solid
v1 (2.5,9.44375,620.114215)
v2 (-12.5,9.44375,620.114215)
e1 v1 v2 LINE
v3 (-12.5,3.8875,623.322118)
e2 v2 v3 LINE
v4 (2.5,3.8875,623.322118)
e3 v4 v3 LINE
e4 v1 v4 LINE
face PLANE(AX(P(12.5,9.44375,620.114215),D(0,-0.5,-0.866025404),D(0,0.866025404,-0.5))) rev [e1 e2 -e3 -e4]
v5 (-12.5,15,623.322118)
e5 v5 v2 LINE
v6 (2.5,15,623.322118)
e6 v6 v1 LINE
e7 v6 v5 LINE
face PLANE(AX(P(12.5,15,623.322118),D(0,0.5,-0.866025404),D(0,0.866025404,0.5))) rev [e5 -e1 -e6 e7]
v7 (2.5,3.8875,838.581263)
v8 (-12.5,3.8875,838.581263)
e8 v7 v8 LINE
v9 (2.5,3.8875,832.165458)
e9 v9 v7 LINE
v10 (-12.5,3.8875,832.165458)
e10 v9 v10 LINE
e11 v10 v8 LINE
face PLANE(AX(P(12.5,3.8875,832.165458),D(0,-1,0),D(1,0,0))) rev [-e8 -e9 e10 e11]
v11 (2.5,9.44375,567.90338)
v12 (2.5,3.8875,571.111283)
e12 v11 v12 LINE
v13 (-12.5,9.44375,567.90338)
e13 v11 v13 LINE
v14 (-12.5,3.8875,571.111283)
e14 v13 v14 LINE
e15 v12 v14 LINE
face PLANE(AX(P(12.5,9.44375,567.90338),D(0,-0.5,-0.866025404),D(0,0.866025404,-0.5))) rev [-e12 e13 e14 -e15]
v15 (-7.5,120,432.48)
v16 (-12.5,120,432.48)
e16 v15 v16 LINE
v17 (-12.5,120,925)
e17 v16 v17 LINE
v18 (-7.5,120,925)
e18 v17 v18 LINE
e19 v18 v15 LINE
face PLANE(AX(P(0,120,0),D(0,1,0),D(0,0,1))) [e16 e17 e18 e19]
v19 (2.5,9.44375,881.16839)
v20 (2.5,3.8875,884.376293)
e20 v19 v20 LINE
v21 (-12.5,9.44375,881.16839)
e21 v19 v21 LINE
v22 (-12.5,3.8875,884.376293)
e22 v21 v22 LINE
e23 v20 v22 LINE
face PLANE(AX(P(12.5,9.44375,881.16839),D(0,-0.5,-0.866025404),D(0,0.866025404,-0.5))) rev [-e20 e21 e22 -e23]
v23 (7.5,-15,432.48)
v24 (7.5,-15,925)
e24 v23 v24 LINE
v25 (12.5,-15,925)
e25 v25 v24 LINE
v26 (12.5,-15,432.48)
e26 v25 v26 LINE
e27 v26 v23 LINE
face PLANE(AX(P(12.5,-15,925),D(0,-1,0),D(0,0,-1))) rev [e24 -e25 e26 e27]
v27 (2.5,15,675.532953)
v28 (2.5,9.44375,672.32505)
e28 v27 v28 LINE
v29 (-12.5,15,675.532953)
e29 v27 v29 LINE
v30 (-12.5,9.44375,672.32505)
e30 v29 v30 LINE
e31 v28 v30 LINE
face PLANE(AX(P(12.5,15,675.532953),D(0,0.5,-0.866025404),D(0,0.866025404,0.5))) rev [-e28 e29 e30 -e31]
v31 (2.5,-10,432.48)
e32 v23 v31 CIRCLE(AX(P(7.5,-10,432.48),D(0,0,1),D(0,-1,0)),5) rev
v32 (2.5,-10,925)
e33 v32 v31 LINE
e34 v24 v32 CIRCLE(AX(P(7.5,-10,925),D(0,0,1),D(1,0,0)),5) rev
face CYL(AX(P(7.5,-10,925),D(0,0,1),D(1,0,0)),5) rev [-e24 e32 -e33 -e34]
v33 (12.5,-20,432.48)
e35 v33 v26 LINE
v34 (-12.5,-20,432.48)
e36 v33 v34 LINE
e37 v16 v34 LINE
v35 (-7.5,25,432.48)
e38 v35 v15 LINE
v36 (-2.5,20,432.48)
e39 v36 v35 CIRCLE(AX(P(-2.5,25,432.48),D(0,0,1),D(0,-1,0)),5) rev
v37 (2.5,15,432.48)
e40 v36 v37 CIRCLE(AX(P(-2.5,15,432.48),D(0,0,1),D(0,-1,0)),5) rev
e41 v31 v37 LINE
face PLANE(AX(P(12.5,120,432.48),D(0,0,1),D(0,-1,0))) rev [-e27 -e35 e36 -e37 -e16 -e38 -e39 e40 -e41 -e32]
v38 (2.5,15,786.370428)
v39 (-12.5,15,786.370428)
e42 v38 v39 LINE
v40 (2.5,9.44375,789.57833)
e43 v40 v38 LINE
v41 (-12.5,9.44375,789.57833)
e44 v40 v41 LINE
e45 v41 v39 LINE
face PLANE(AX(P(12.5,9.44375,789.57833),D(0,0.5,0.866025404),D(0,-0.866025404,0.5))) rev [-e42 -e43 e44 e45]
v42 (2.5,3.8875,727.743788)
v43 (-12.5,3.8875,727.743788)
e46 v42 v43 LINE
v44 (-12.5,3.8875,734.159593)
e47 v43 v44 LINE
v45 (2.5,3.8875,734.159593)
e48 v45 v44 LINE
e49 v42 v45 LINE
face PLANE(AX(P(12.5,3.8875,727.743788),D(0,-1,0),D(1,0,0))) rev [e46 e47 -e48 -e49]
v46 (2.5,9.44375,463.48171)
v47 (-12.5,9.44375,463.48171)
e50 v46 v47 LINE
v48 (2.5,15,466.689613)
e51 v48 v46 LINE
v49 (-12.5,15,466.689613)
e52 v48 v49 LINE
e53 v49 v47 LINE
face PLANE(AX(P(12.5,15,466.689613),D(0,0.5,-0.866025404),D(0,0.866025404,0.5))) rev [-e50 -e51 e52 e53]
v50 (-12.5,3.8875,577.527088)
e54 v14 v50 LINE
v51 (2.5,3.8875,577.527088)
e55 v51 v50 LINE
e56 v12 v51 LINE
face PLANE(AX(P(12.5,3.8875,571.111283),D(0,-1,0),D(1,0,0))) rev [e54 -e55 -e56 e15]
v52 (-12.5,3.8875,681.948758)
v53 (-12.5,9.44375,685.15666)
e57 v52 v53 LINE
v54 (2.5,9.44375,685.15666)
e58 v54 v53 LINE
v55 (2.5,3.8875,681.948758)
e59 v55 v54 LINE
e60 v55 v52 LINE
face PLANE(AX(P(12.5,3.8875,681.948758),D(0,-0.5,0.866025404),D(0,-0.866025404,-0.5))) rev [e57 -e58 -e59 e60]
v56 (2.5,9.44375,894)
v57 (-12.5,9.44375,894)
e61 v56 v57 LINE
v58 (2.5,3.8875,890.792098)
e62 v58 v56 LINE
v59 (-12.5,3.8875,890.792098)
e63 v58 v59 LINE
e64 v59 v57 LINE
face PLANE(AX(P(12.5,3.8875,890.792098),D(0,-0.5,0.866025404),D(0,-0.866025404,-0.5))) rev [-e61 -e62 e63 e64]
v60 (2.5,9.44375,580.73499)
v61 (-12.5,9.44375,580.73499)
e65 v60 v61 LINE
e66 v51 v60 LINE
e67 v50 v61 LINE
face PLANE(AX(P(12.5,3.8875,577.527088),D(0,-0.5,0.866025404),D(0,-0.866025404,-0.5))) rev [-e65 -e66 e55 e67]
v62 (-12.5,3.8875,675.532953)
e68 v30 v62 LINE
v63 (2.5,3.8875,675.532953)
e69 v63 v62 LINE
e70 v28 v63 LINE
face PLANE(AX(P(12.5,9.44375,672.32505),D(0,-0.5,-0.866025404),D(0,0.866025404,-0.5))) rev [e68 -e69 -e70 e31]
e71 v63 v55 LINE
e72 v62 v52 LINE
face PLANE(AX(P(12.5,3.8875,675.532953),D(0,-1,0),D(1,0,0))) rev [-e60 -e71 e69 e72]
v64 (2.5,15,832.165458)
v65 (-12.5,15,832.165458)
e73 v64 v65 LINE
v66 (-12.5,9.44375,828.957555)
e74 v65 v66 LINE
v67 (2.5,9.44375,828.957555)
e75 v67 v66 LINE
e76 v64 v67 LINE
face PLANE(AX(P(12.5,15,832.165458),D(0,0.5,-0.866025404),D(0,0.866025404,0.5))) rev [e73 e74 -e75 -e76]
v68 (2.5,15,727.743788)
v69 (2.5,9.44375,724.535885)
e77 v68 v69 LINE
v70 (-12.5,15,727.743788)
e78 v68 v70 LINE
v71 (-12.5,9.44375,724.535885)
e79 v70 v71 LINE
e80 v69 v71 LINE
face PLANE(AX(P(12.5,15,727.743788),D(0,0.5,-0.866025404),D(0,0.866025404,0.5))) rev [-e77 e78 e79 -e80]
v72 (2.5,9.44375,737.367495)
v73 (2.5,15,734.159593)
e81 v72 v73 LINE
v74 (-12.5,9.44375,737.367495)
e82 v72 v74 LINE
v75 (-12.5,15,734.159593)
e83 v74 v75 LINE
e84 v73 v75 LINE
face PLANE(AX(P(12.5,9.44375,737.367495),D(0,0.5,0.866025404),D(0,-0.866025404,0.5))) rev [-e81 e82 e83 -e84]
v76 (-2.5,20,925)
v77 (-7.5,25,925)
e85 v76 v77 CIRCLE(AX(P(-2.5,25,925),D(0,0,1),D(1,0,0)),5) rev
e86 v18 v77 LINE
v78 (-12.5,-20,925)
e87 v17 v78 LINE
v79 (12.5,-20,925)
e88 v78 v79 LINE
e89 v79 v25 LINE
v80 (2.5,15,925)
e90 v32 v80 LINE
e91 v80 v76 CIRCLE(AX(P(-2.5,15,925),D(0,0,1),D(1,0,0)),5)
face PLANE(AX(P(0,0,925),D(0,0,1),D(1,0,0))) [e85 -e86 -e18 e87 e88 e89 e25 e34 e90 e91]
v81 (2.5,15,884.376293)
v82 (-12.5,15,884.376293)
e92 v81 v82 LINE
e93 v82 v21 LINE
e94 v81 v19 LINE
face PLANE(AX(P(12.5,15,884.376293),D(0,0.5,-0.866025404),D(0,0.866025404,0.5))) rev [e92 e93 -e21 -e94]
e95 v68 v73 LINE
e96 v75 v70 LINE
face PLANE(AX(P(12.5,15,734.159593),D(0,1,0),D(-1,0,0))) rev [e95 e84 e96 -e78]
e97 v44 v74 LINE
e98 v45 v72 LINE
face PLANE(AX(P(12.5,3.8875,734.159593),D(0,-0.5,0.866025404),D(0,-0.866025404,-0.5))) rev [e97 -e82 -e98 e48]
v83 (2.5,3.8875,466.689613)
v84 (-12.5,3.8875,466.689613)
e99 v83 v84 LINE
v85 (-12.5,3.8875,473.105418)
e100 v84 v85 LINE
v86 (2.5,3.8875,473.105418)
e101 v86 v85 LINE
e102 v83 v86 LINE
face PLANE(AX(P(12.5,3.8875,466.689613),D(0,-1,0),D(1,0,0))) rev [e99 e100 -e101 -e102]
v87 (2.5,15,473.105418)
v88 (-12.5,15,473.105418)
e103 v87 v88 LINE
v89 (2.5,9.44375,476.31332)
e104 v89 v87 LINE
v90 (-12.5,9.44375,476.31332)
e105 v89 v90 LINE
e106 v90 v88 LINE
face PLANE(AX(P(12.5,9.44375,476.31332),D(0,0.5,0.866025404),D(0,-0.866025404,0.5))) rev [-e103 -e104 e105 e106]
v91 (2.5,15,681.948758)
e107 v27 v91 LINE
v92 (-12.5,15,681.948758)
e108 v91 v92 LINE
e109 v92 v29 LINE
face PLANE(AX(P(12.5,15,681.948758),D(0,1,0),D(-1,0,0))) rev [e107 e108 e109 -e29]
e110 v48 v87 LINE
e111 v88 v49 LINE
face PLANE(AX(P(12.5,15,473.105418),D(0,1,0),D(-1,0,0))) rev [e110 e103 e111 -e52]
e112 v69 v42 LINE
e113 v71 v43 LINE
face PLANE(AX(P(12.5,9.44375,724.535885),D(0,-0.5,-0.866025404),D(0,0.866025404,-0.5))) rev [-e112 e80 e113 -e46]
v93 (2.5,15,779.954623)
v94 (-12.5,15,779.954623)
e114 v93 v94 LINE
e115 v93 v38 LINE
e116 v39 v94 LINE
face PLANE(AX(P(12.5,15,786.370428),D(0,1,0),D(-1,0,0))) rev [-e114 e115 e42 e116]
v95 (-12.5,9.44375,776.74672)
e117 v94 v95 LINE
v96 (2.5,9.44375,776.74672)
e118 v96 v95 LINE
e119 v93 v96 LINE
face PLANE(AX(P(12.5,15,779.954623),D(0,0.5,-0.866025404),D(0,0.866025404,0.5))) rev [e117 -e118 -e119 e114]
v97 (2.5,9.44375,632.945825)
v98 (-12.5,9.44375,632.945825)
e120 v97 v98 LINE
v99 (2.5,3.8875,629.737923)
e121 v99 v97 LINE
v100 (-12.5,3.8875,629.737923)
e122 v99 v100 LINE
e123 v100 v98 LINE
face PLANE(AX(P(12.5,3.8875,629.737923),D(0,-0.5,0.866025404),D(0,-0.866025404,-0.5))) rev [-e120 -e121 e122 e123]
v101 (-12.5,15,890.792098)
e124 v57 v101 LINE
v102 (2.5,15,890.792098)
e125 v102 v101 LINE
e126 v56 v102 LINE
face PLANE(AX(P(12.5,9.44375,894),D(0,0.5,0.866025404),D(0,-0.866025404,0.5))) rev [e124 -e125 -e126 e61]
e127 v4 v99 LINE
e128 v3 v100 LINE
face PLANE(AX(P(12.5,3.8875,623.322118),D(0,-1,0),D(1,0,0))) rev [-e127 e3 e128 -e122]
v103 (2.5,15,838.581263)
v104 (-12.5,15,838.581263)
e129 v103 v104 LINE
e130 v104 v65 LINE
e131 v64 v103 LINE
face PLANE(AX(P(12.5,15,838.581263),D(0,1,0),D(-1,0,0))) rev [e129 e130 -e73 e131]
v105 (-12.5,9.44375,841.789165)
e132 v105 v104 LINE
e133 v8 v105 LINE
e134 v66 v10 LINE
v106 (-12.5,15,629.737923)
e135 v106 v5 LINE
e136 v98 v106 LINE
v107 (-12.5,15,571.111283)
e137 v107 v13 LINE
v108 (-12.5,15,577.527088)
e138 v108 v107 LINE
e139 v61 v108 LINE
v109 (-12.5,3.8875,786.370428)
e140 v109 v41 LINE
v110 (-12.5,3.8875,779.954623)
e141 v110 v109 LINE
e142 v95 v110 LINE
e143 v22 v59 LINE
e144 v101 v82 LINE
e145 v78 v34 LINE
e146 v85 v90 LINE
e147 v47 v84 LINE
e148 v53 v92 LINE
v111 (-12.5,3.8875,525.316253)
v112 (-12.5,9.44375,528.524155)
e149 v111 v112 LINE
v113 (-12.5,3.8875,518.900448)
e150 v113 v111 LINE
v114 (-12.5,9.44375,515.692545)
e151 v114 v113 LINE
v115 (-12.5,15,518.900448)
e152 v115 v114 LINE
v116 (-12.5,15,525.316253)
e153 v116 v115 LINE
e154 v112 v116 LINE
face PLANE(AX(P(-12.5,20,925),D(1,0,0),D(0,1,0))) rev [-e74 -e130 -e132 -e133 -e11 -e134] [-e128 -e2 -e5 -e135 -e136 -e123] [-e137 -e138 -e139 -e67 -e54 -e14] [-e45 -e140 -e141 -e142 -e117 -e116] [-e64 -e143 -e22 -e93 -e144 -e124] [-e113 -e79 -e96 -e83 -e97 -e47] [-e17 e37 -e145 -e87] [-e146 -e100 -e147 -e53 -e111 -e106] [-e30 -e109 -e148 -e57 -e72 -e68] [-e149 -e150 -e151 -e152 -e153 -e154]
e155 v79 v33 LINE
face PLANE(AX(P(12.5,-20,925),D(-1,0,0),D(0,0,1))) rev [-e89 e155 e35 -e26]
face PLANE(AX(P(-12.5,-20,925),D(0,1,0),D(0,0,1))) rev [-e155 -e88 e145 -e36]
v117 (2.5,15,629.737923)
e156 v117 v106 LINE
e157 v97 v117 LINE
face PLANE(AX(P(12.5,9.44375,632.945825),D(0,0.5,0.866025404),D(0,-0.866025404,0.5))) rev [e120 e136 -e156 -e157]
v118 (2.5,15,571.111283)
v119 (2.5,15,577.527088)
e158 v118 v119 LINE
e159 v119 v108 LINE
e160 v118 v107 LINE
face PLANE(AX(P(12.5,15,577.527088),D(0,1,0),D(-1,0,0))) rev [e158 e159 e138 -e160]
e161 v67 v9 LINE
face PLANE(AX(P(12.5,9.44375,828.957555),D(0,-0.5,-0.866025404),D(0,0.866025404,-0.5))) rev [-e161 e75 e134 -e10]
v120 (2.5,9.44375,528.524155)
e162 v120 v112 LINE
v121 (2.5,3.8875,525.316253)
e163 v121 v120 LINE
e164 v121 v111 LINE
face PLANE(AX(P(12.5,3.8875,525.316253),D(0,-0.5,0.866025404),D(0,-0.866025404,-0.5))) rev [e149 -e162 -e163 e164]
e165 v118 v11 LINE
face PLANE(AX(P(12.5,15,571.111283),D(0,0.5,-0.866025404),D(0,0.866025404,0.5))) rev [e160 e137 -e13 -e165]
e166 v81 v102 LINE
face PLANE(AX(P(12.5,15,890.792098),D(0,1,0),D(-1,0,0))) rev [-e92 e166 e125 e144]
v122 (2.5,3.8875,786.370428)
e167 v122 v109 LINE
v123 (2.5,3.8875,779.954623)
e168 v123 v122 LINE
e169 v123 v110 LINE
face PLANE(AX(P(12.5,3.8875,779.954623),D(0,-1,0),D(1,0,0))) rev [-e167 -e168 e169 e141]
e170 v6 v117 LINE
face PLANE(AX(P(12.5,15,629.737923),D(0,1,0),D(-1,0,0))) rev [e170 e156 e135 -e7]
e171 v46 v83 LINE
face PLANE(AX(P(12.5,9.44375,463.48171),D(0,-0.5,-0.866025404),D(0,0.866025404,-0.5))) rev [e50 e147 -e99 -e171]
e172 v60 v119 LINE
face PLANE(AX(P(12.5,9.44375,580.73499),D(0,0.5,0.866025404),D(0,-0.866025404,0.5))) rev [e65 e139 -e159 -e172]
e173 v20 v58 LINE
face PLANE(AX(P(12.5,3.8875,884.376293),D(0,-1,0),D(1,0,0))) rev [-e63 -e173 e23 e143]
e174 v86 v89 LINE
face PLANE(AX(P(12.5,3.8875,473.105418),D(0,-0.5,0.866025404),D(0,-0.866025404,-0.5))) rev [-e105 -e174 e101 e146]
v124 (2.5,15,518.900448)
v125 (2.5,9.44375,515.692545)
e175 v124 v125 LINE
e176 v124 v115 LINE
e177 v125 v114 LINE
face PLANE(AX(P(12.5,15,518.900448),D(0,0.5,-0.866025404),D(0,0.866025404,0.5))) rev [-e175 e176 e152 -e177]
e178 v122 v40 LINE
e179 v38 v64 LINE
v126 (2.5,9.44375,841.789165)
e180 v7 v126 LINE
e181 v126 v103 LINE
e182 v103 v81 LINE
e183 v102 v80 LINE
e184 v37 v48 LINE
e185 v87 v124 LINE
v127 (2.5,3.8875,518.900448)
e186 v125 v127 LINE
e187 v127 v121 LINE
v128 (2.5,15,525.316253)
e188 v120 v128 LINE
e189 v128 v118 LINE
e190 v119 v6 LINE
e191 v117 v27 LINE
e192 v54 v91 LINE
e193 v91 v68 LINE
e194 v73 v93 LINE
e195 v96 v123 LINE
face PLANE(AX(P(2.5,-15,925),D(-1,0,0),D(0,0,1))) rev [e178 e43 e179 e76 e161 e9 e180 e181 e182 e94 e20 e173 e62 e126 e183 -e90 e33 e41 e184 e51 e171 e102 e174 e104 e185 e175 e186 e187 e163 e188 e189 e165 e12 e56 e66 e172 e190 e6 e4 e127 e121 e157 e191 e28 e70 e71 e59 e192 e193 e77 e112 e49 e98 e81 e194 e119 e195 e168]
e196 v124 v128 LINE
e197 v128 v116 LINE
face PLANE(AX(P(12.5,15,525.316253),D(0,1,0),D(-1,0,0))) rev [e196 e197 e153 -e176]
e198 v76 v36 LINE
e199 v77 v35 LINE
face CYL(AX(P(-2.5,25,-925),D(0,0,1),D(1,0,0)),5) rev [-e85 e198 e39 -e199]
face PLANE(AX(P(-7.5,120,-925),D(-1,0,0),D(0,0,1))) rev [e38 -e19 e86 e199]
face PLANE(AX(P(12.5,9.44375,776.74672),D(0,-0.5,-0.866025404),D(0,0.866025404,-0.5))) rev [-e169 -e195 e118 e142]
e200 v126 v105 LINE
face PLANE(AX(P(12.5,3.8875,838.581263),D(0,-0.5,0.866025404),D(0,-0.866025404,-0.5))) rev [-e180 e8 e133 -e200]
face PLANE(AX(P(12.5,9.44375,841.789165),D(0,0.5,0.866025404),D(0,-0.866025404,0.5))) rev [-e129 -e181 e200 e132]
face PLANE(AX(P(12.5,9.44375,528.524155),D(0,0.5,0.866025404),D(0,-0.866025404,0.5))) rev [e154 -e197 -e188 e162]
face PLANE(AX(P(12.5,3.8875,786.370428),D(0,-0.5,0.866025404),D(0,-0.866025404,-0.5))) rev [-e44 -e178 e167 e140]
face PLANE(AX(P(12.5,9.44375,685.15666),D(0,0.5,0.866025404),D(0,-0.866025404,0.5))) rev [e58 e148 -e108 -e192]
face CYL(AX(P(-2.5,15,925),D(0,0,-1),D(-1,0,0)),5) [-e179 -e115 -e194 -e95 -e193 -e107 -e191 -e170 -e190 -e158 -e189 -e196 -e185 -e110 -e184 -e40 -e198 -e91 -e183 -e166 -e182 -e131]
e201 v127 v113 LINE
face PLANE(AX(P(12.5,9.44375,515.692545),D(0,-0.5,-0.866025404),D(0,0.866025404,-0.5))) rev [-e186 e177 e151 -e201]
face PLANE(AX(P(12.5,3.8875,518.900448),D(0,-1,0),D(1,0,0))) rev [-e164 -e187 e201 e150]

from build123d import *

# Parameters (mm, degrees)
GENERAL_EXTRUDE_DEPTH       = 925
ROUNDING_R                  = 5
ROLLER_HOLDERS_DEPTH        = 926.55388822
SKETCH5_W                   = 5
SKETCH5_H                   = 1850
GUARD_RAIL_DEPTH            = 100
GUARD_RAIL_SUPPORT_FILLET_R = 5
CUT_TO_SIZE_DEPTH           = 934.086276825
CUT_TO_SIZE_DEPTH_BACK      = 934.086276825
SKETCH6_W                   = 1357.48
SKETCH6_H                   = 140


with BuildPart() as part:
    # Sketch2 → General extrude (new, symmetric)
    with BuildSketch(Plane.XY):
        Polygon((-12.5, 20), (-12.5, -20), (12.5, -20), (12.5, -15), (2.5, -15), (2.5, 20), align=None)
    extrude(amount=GENERAL_EXTRUDE_DEPTH, both=True)

    # Rounding
    rounding_edges = [part.edges().sort_by_distance(p)[0] for p in [
        (2.5, 20, 0),
        (2.5, -15, 0),
    ]]
    fillet(rounding_edges, radius=ROUNDING_R)

    # Sketch3 → Roller holders (cut, through all)
    with BuildSketch(Plane.ZY.offset(12.5)):
        Polygon((-884.3762927, 3.8875), (-881.168390267, 9.44375), (-884.3762927, 15), (-890.792097567, 15), (-894, 9.44375), (-890.792097567, 3.8875), align=None)
        Polygon((-832.165457693, 3.8875), (-828.957555259, 9.44375), (-832.165457693, 15), (-838.581262559, 15), (-841.789164992, 9.44375), (-838.581262559, 3.8875), align=None)
        Polygon((-779.954622685, 3.8875), (-776.746720252, 9.44375), (-779.954622685, 15), (-786.370427551, 15), (-789.578329984, 9.44375), (-786.370427551, 3.8875), align=None)
        Polygon((-727.743787677, 3.8875), (-724.535885244, 9.44375), (-727.743787677, 15), (-734.159592543, 15), (-737.367494976, 9.44375), (-734.159592543, 3.8875), align=None)
        Polygon((-675.532952669, 3.8875), (-672.325050236, 9.44375), (-675.532952669, 15), (-681.948757535, 15), (-685.156659969, 9.44375), (-681.948757535, 3.8875), align=None)
        Polygon((-623.322117661, 3.8875), (-620.114215228, 9.44375), (-623.322117661, 15), (-629.737922528, 15), (-632.945824961, 9.44375), (-629.737922528, 3.8875), align=None)
        Polygon((-571.111282653, 3.8875), (-567.90338022, 9.44375), (-571.111282653, 15), (-577.52708752, 15), (-580.734989953, 9.44375), (-577.52708752, 3.8875), align=None)
        Polygon((-518.900447645, 3.8875), (-515.692545212, 9.44375), (-518.900447645, 15), (-525.316252512, 15), (-528.524154945, 9.44375), (-525.316252512, 3.8875), align=None)
        Polygon((-466.689612638, 3.8875), (-463.481710204, 9.44375), (-466.689612638, 15), (-473.105417504, 15), (-476.313319937, 9.44375), (-473.105417504, 3.8875), align=None)
        Polygon((-414.47877763, 3.8875), (-411.270875197, 9.44375), (-414.47877763, 15), (-420.894582496, 15), (-424.102484929, 9.44375), (-420.894582496, 3.8875), align=None)
        Polygon((-362.267942622, 3.8875), (-359.060040189, 9.44375), (-362.267942622, 15), (-368.683747488, 15), (-371.891649921, 9.44375), (-368.683747488, 3.8875), align=None)
        Polygon((-310.057107614, 3.8875), (-306.849205181, 9.44375), (-310.057107614, 15), (-316.47291248, 15), (-319.680814914, 9.44375), (-316.47291248, 3.8875), align=None)
        Polygon((-257.846272606, 3.8875), (-254.638370173, 9.44375), (-257.846272606, 15), (-264.262077472, 15), (-267.469979906, 9.44375), (-264.262077472, 3.8875), align=None)
        Polygon((-205.635437598, 3.8875), (-202.427535165, 9.44375), (-205.635437598, 15), (-212.051242465, 15), (-215.259144898, 9.44375), (-212.051242465, 3.8875), align=None)
        Polygon((-153.42460259, 3.8875), (-150.216700157, 9.44375), (-153.42460259, 15), (-159.840407457, 15), (-163.04830989, 9.44375), (-159.840407457, 3.8875), align=None)
        Polygon((-101.213767583, 3.8875), (-98.005865149, 9.44375), (-101.213767583, 15), (-107.629572449, 15), (-110.837474882, 9.44375), (-107.629572449, 3.8875), align=None)
        Polygon((-49.002932575, 3.8875), (-45.795030141, 9.44375), (-49.002932575, 15), (-55.418737441, 15), (-58.626639874, 9.44375), (-55.418737441, 3.8875), align=None)
        Polygon((3.207902433, 3.8875), (6.415804866, 9.44375), (3.207902433, 15), (-3.207902433, 15), (-6.415804866, 9.44375), (-3.207902433, 3.8875), align=None)
        Polygon((55.418737441, 3.8875), (58.626639874, 9.44375), (55.418737441, 15), (49.002932575, 15), (45.795030141, 9.44375), (49.002932575, 3.8875), align=None)
        Polygon((107.629572449, 3.8875), (110.837474882, 9.44375), (107.629572449, 15), (101.213767583, 15), (98.005865149, 9.44375), (101.213767583, 3.8875), align=None)
        Polygon((159.840407457, 3.8875), (163.04830989, 9.44375), (159.840407457, 15), (153.42460259, 15), (150.216700157, 9.44375), (153.42460259, 3.8875), align=None)
        Polygon((212.051242465, 3.8875), (215.259144898, 9.44375), (212.051242465, 15), (205.635437598, 15), (202.427535165, 9.44375), (205.635437598, 3.8875), align=None)
        Polygon((264.262077472, 3.8875), (267.469979906, 9.44375), (264.262077472, 15), (257.846272606, 15), (254.638370173, 9.44375), (257.846272606, 3.8875), align=None)
        Polygon((316.47291248, 3.8875), (319.680814914, 9.44375), (316.47291248, 15), (310.057107614, 15), (306.849205181, 9.44375), (310.057107614, 3.8875), align=None)
        Polygon((368.683747488, 3.8875), (371.891649921, 9.44375), (368.683747488, 15), (362.267942622, 15), (359.060040189, 9.44375), (362.267942622, 3.8875), align=None)
        Polygon((420.894582496, 3.8875), (424.102484929, 9.44375), (420.894582496, 15), (414.47877763, 15), (411.270875197, 9.44375), (414.47877763, 3.8875), align=None)
        Polygon((473.105417504, 3.8875), (476.313319937, 9.44375), (473.105417504, 15), (466.689612638, 15), (463.481710204, 9.44375), (466.689612638, 3.8875), align=None)
        Polygon((525.316252512, 3.8875), (528.524154945, 9.44375), (525.316252512, 15), (518.900447645, 15), (515.692545212, 9.44375), (518.900447645, 3.8875), align=None)
        Polygon((577.52708752, 3.8875), (580.734989953, 9.44375), (577.52708752, 15), (571.111282653, 15), (567.90338022, 9.44375), (571.111282653, 3.8875), align=None)
        Polygon((629.737922528, 3.8875), (632.945824961, 9.44375), (629.737922528, 15), (623.322117661, 15), (620.114215228, 9.44375), (623.322117661, 3.8875), align=None)
        Polygon((681.948757535, 3.8875), (685.156659969, 9.44375), (681.948757535, 15), (675.532952669, 15), (672.325050236, 9.44375), (675.532952669, 3.8875), align=None)
        Polygon((734.159592543, 3.8875), (737.367494976, 9.44375), (734.159592543, 15), (727.743787677, 15), (724.535885244, 9.44375), (727.743787677, 3.8875), align=None)
        Polygon((786.370427551, 3.8875), (789.578329984, 9.44375), (786.370427551, 15), (779.954622685, 15), (776.746720252, 9.44375), (779.954622685, 3.8875), align=None)
        Polygon((838.581262559, 3.8875), (841.789164992, 9.44375), (838.581262559, 15), (832.165457693, 15), (828.957555259, 9.44375), (832.165457693, 3.8875), align=None)
        Polygon((890.792097567, 3.8875), (894, 9.44375), (890.792097567, 15), (884.3762927, 15), (881.168390267, 9.44375), (884.3762927, 3.8875), align=None)
    extrude(amount=-ROLLER_HOLDERS_DEPTH, mode=Mode.SUBTRACT)

    # Sketch5 → Guard rail (add)
    with BuildSketch(Plane(origin=(0, 20, 0), x_dir=(1, 0, 0), z_dir=(0, 1, 0))):
        with Locations((-10, 0)):
            Rectangle(SKETCH5_W, SKETCH5_H)
    extrude(amount=GUARD_RAIL_DEPTH)

    # Guard rail support fillet
    guard_rail_support_fillet_edges = [part.edges().sort_by_distance(p)[0] for p in [
        (-7.5, 20, 0),
    ]]
    fillet(guard_rail_support_fillet_edges, radius=GUARD_RAIL_SUPPORT_FILLET_R - 0.0001)  # a hair under: the kernel refuses the full size

    # Sketch6 → CUT TO SIZE (cut, two sides: drawn at the far end of the back side and taken through both)
    with BuildSketch(Plane.ZY.offset(12.5).offset(-CUT_TO_SIZE_DEPTH_BACK)):
        with Locations((-246.26, 50)):
            Rectangle(SKETCH6_W, SKETCH6_H)
    extrude(amount=CUT_TO_SIZE_DEPTH + CUT_TO_SIZE_DEPTH_BACK, mode=Mode.SUBTRACT)


solid = part.part
